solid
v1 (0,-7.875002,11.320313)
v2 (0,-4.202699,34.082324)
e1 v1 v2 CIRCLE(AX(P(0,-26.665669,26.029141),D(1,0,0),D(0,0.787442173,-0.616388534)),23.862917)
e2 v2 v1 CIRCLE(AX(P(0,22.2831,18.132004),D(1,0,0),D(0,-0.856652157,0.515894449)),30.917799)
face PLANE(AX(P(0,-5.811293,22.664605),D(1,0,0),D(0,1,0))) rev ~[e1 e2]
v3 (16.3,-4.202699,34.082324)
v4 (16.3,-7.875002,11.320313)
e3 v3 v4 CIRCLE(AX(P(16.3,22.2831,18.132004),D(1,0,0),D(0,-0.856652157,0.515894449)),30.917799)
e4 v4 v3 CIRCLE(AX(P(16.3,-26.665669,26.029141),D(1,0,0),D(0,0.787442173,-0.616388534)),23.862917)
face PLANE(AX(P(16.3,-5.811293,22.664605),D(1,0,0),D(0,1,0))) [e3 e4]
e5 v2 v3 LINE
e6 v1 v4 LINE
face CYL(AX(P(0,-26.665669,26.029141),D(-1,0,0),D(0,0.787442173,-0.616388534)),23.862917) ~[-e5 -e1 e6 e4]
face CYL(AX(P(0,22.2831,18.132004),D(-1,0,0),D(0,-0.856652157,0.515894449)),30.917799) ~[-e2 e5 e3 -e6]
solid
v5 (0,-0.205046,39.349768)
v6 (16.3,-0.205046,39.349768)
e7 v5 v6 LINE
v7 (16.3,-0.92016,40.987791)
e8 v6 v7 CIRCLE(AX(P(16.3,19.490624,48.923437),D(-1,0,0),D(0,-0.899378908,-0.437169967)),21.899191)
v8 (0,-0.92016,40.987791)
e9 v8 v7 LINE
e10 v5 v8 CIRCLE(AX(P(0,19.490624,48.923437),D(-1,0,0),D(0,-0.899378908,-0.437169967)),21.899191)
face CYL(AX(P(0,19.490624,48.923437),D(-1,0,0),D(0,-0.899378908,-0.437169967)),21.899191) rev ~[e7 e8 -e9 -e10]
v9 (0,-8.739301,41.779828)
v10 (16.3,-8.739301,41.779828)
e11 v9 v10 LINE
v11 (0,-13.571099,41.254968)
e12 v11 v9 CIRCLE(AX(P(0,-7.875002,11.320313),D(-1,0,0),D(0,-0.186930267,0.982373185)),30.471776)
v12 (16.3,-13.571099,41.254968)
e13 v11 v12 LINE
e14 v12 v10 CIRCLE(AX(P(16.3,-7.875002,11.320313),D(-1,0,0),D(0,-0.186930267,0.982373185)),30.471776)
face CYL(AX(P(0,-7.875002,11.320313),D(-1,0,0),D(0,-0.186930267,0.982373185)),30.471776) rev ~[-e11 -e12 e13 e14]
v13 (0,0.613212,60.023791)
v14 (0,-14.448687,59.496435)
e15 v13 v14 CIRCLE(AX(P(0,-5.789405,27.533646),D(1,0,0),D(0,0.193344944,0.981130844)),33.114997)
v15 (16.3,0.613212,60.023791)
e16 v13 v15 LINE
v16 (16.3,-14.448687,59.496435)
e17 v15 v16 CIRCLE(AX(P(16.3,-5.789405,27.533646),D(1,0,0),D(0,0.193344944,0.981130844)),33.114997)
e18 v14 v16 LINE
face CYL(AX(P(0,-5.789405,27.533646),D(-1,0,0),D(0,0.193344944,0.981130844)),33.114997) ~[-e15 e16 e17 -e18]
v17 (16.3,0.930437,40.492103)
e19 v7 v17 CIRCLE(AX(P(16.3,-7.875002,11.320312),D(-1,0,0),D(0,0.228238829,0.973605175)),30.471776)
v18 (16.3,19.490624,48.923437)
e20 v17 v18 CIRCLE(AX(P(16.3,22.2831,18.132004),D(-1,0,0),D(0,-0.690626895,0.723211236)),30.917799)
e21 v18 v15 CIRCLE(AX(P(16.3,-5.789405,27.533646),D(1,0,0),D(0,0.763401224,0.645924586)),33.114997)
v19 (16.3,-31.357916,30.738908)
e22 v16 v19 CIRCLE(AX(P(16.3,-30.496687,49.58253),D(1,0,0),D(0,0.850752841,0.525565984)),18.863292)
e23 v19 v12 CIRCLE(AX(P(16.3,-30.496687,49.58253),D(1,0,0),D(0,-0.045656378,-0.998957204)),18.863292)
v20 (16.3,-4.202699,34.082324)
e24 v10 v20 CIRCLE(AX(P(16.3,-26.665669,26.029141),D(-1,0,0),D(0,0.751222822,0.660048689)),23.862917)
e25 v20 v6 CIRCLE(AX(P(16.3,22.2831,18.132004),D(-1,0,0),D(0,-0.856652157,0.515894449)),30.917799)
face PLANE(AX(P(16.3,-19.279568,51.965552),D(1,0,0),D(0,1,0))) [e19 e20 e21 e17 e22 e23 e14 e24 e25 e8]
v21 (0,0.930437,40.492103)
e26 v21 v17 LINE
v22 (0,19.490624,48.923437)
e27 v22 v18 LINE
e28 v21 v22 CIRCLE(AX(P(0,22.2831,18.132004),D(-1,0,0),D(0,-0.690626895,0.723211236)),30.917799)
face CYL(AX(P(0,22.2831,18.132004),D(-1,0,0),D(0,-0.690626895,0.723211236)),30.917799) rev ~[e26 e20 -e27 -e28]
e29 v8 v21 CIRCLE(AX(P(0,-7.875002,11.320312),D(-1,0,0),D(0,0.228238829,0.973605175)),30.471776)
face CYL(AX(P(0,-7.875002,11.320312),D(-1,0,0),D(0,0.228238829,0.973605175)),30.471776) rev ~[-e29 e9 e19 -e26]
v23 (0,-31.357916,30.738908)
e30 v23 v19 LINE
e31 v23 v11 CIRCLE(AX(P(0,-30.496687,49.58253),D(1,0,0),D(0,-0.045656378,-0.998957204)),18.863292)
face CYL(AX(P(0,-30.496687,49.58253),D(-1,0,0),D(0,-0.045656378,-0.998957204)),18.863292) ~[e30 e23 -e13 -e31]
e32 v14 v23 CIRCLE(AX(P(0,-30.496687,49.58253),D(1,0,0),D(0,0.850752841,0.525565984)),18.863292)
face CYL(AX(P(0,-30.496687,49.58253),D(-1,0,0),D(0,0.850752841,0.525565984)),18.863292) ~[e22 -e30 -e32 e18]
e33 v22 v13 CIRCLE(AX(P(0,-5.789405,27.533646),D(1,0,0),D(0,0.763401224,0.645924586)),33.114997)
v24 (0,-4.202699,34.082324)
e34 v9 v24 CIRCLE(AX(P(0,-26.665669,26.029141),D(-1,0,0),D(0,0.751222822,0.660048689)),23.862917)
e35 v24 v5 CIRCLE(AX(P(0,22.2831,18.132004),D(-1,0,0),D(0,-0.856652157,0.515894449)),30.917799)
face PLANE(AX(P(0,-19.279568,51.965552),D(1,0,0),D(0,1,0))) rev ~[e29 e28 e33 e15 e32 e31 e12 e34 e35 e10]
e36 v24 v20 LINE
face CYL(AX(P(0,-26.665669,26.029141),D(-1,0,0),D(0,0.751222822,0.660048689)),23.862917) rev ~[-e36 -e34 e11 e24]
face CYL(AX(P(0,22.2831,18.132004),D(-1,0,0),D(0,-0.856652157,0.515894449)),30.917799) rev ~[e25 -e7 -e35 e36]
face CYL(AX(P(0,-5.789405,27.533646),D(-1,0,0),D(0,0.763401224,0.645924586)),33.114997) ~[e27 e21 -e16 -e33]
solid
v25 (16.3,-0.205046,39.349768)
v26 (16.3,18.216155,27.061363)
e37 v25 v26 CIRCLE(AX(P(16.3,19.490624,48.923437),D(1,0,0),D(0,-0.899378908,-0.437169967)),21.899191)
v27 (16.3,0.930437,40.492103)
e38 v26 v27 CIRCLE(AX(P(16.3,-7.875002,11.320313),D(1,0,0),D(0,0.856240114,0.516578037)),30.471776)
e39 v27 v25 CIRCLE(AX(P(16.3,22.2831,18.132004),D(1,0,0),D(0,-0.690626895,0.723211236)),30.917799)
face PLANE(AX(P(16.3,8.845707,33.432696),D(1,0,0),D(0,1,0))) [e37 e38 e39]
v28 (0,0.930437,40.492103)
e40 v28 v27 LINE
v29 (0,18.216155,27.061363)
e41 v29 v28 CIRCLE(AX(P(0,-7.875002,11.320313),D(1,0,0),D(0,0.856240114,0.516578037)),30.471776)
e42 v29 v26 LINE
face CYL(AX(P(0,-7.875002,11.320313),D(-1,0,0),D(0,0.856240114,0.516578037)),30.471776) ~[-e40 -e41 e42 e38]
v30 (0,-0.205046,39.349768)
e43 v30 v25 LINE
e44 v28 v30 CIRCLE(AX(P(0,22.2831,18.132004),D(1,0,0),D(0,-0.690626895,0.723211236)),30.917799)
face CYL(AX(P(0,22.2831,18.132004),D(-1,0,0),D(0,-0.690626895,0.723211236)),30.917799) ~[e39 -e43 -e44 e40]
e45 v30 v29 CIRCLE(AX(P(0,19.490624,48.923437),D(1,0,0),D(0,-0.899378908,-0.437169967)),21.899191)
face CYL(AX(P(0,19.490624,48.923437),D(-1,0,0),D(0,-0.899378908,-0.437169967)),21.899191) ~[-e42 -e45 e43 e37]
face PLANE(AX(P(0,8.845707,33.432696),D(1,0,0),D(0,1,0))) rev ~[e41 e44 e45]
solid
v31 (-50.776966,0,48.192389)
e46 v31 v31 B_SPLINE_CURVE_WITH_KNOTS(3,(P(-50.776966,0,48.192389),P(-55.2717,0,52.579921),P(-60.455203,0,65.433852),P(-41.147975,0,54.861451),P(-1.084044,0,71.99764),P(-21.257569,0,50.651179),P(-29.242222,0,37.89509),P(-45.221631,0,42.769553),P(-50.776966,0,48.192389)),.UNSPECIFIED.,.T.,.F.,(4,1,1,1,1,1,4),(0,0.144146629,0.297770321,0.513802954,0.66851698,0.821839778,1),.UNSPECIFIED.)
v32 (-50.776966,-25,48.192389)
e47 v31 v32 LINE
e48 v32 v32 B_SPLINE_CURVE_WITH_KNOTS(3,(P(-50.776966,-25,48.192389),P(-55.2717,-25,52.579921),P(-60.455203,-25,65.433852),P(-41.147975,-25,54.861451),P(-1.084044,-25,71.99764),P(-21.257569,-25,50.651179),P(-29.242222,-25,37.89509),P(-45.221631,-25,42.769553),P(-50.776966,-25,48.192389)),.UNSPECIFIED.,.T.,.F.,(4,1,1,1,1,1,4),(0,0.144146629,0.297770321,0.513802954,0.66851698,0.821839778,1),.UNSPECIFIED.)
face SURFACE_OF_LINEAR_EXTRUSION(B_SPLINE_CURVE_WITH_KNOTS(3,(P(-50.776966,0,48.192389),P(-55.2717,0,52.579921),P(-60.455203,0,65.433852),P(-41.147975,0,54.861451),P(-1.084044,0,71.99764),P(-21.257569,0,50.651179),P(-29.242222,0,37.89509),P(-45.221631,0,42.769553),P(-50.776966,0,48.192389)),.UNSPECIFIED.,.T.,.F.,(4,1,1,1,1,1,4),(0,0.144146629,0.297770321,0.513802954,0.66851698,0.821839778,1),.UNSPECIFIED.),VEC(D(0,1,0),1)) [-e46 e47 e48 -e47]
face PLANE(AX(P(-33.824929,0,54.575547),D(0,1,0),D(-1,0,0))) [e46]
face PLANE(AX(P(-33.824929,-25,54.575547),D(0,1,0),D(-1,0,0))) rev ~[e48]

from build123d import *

# Parameters (mm, degrees)
F1_DEPTH = 16.3
F3_DEPTH = 25


with BuildPart() as f1:
    # F0 (on Right) → F1 (new body)
    with BuildSketch(Plane.YZ):
        with BuildLine():
            ThreePointArc((-12.1971222107, 45.0054410083), (-11.7748566709, 47.2766931346), (-11.6333942401, 49.5825298131))
            ThreePointArc((-11.6333942401, 49.5825298131), (-12.3508619293, 54.7354751662), (-14.44868705, 59.4964346767))
            ThreePointArc((-14.44868705, 59.4964346767), (-23.1935215297, 55.7063236123), (-30.496686697, 49.5825298131))
            ThreePointArc((-30.496686697, 49.5825298131), (-20.8754452172, 49.1789168751), (-12.1971222107, 45.0054410083))
        make_face()
        with BuildLine():
            ThreePointArc((-14.44868705, 59.4964346767), (-12.3508619293, 54.7354751662), (-11.6333942401, 49.5825298131))
            ThreePointArc((-11.6333942401, 49.5825298131), (-11.7748566709, 47.2766931346), (-12.1971222107, 45.0054410083))
            ThreePointArc((-12.1971222107, 45.0054410083), (-10.3881149892, 43.4784974996), (-8.7393013606, 41.7798282486))
            ThreePointArc((-8.7393013606, 41.7798282486), (-4.8040885537, 41.6369515569), (-0.9201595956, 40.987790996))
            ThreePointArc((-0.9201595956, 40.987790996), (-2.3378643948, 50.6817460292), (0.6132117717, 60.0237908024))
            ThreePointArc((0.6132117717, 60.0237908024), (-6.9481373655, 60.6283639636), (-14.44868705, 59.4964346767))
        make_face()
        with BuildLine():
            ThreePointArc((-30.496686697, 49.5825298131), (-23.1935215297, 55.7063236123), (-14.44868705, 59.4964346767))
            ThreePointArc((-14.44868705, 59.4964346767), (-46.7573242092, 59.1436735736), (-31.357916302, 30.7389079244))
            ThreePointArc((-31.357916302, 30.7389079244), (-23.3830823555, 37.5506109415), (-13.5710991485, 41.2549678377))
            ThreePointArc((-13.5710991485, 41.2549678377), (-12.7845624252, 43.0937351564), (-12.1971222107, 45.0054410083))
            ThreePointArc((-12.1971222107, 45.0054410083), (-20.8754452172, 49.1789168751), (-30.496686697, 49.5825298131))
        make_face()
        with BuildLine():
            ThreePointArc((-8.7393013606, 41.7798282486), (-10.3881149892, 43.4784974996), (-12.1971222107, 45.0054410083))
            ThreePointArc((-12.1971222107, 45.0054410083), (-12.7845624252, 43.0937351564), (-13.5710991485, 41.2549678377))
            ThreePointArc((-13.5710991485, 41.2549678377), (-11.1656812919, 41.6138851313), (-8.7393013606, 41.7798282486))
        make_face()
        with BuildLine():
            ThreePointArc((-13.5710991485, 41.2549678377), (-23.3830823555, 37.5506109415), (-31.357916302, 30.7389079244))
            ThreePointArc((-31.357916302, 30.7389079244), (-20.8965420075, 33.3448876118), (-13.5710991485, 41.2549678377))
        make_face()
        with BuildLine():
            ThreePointArc((19.4906238467, 48.9234365523), (10.9960641192, 56.0792416197), (0.6132117717, 60.0237908024))
            ThreePointArc((0.6132117717, 60.0237908024), (-2.3378643948, 50.6817460292), (-0.9201595956, 40.987790996))
            ThreePointArc((-0.9201595956, 40.987790996), (0.0090353267, 40.7544944765), (0.9304370528, 40.4921029198))
            ThreePointArc((0.9304370528, 40.4921029198), (9.4956537387, 46.2814526039), (19.4906238467, 48.9234365523))
        make_face()
        with BuildLine():
            ThreePointArc((-0.9201595956, 40.987790996), (-4.8040885537, 41.6369515569), (-8.7393013606, 41.7798282486))
            ThreePointArc((-8.7393013606, 41.7798282486), (-6.1075185605, 38.1452977309), (-4.2026985521, 34.0823242475))
            ThreePointArc((-4.2026985521, 34.0823242475), (-2.3451015259, 36.82323), (-0.2050463277, 39.3497681066))
            ThreePointArc((-0.2050463277, 39.3497681066), (-0.5793209757, 40.1614809514), (-0.9201595956, 40.987790996))
        make_face()
    extrude(amount=F1_DEPTH)


with BuildPart() as f1b:
    # F0 (on Right) → F1, piece 2 (new body)
    with BuildSketch(Plane.YZ):
        with BuildLine():
            ThreePointArc((-7.8750019893, 11.3203125075), (-3.1073807878, 22.228370486), (-4.2026985521, 34.0823242475))
            ThreePointArc((-4.2026985521, 34.0823242475), (-8.2400086329, 23.0564417081), (-7.8750019893, 11.3203125075))
        make_face()
    extrude(amount=F1_DEPTH)


with BuildPart() as f1c:
    # F0 (on Right) → F1, piece 3 (new body)
    with BuildSketch(Plane.YZ):
        with BuildLine():
            ThreePointArc((-0.2050463277, 39.3497681066), (7.3379322182, 30.7056804526), (18.216154673, 27.0613625553))
            ThreePointArc((18.216154673, 27.0613625553), (10.8209680209, 35.382519762), (0.9304370528, 40.4921029198))
            ThreePointArc((0.9304370528, 40.4921029198), (0.3552553346, 39.9283309178), (-0.2050463277, 39.3497681066))
        make_face()
    extrude(amount=F1_DEPTH)


with BuildPart() as f3:
    # F2 (on Front) → F3 (new body)
    with BuildSketch(Plane.XZ):
        with BuildLine():
            add(Edge.make_bspline(
                [(-50.7769659162, 48.1923893094), (-55.2717001004, 52.5799209169), (-60.455203499, 65.4338519193), (-41.1479753801, 54.8614513769), (-1.0840439012, 71.9976398536), (-21.2575691949, 50.6511793978), (-29.2422220069, 37.8950901924), (-45.221630707, 42.7695527586), (-50.7769659162, 48.1923893094)],
                knots=[0, 0, 0, 0, 0.1441466285, 0.2977703205, 0.5138029535, 0.66851698, 0.8218397779, 1, 1, 1, 1], degree=3))
        make_face()
    extrude(amount=F3_DEPTH)


solid = Compound([f1.part, f1b.part, f1c.part, f3.part])
